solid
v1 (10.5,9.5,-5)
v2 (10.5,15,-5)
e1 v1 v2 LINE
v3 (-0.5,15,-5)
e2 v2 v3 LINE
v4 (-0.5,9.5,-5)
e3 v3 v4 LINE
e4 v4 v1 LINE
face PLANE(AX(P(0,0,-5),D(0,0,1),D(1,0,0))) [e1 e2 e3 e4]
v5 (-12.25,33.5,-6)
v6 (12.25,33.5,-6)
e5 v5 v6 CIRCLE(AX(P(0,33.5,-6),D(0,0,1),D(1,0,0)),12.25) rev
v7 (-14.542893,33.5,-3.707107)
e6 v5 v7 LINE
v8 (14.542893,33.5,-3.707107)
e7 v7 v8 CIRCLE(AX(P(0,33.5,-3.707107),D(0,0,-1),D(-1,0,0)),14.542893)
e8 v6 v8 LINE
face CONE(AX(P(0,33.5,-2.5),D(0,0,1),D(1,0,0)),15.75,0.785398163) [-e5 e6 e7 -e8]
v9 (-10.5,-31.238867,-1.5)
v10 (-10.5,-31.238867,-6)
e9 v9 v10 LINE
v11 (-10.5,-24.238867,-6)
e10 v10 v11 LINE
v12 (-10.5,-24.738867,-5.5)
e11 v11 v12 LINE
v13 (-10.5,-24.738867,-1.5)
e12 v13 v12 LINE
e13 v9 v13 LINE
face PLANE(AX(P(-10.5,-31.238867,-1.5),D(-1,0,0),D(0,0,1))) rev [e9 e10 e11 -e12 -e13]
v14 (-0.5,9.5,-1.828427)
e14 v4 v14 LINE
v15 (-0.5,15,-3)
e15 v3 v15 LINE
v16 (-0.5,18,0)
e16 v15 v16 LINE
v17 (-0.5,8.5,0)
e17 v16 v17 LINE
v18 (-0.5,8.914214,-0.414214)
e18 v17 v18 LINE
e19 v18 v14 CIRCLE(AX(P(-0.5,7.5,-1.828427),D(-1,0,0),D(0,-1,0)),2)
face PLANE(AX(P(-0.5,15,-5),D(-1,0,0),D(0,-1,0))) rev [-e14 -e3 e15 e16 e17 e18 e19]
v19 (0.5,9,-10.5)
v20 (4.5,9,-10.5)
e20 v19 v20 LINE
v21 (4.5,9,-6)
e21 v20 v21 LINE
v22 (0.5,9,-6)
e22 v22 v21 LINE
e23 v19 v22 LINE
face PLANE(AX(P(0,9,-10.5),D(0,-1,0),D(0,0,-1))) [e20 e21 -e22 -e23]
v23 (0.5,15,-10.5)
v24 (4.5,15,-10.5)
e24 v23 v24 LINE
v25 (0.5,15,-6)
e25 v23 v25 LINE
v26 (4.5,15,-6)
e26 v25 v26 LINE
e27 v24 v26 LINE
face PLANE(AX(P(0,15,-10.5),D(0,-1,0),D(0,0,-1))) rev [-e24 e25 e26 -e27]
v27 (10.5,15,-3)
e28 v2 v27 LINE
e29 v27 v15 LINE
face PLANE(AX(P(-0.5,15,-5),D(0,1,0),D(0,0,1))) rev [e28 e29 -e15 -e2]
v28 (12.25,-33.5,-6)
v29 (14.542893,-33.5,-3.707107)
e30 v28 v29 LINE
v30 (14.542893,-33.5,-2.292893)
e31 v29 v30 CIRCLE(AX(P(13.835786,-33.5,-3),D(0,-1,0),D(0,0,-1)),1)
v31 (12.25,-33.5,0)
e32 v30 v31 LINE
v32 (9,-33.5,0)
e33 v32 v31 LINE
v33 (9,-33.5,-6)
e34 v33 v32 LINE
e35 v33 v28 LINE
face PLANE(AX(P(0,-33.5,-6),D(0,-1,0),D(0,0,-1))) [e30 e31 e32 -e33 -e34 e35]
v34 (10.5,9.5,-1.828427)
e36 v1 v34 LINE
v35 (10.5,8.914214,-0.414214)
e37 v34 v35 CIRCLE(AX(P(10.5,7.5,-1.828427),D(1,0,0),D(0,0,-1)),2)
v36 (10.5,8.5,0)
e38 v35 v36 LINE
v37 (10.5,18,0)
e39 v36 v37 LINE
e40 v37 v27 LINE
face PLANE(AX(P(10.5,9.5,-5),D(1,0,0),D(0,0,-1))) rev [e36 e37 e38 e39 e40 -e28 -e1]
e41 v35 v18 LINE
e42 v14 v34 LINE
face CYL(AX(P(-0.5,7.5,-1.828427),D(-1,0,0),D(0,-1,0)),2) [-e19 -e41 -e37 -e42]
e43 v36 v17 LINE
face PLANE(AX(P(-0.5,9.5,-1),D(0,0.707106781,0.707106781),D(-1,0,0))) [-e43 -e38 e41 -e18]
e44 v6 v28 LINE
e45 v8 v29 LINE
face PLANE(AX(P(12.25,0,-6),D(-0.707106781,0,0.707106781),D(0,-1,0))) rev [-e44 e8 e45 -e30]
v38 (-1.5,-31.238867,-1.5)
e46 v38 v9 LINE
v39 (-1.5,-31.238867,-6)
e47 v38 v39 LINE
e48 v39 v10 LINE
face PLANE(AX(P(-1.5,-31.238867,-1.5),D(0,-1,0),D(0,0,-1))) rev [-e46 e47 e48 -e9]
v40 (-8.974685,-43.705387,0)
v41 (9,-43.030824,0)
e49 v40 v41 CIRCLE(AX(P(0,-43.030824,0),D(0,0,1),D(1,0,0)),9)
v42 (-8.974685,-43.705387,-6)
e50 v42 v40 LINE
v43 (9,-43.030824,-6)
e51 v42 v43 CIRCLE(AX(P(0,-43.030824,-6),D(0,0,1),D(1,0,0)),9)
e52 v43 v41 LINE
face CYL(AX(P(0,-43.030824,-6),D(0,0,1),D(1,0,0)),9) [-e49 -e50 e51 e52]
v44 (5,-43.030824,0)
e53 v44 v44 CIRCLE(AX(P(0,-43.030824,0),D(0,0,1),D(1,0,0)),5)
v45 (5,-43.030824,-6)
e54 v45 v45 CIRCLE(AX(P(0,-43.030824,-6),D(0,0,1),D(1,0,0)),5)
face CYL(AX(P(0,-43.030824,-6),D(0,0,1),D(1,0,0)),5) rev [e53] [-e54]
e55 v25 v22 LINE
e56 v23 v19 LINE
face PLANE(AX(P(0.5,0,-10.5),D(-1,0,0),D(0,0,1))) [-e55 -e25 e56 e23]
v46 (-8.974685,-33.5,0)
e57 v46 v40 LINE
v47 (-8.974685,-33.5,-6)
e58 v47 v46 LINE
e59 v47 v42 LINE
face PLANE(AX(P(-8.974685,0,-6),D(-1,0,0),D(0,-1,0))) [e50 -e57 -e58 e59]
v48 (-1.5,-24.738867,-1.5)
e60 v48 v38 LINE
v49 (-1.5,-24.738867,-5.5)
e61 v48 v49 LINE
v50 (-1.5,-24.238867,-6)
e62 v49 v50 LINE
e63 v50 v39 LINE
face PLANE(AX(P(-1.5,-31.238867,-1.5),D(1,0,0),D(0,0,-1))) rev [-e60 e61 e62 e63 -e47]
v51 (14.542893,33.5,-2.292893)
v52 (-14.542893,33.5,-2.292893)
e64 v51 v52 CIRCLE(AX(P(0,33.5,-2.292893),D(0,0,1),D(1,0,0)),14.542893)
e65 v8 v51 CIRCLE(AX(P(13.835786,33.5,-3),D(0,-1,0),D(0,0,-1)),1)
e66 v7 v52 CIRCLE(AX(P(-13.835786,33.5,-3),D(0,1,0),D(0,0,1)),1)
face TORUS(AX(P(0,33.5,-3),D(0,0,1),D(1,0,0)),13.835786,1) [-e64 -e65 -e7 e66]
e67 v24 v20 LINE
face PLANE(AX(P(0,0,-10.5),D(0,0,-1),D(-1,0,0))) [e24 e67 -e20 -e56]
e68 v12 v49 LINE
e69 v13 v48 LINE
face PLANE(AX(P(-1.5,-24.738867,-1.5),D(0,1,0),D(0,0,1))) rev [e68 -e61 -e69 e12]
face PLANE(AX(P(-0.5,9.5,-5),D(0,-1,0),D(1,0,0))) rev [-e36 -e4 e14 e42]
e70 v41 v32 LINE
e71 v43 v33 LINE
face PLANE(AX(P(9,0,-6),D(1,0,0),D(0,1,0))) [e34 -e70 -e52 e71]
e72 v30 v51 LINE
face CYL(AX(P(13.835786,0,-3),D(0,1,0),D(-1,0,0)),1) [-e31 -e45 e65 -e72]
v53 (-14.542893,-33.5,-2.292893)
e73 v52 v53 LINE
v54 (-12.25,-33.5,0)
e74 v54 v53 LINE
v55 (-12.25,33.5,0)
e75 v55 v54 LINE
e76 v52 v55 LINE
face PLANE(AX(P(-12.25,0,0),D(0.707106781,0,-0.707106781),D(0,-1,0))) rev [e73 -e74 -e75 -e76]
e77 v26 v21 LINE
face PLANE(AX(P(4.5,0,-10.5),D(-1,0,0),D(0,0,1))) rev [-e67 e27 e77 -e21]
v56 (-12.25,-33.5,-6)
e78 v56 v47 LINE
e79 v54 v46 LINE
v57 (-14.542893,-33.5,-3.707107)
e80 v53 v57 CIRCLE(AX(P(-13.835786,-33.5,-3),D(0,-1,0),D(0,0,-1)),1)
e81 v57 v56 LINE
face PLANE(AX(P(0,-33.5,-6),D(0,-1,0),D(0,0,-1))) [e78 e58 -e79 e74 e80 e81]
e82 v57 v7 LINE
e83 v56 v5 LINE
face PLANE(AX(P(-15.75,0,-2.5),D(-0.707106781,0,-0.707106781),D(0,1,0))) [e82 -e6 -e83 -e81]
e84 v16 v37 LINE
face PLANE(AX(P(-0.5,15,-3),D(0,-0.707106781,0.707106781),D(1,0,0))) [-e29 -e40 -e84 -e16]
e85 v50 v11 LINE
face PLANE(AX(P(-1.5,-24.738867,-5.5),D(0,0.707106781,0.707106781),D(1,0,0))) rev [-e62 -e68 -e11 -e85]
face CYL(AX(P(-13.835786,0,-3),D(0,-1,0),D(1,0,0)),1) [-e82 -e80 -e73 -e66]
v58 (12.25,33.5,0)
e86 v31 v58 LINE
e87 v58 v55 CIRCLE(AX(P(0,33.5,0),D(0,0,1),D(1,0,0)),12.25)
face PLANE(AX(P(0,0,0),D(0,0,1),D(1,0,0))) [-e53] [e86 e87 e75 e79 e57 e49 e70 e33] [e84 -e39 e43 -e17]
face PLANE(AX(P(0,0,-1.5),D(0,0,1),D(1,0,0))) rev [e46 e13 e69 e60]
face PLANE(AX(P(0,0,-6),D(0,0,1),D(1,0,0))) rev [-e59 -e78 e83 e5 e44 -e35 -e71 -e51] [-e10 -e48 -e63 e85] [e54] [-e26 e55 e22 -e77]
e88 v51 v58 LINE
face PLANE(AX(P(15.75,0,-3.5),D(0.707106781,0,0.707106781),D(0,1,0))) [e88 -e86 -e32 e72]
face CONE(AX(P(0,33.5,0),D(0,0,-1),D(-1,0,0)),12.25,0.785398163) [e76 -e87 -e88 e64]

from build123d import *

# Parameters (mm, degrees)
DODANIE_WYCI_GNI_CIE1_DEPTH = 6
SFAZOWANIE1_SIZE            = 3.5
ZAOKR_GLENIE1_R             = 1
SZKIC2_W                    = 11
SZKIC2_H                    = 5.5
WYTNIJ_WYCI_GNI_CIE1_DEPTH  = 5
SZKIC3_W                    = 9
SZKIC3_H                    = 6.5
WYTNIJ_WYCI_GNI_CIE2_DEPTH  = 4.5
SFAZOWANIE2_SIZE            = 0.5
SZKIC4_R                    = 5
DODANIE_WYCI_GNI_CIE2_DEPTH = 6
SZKIC5_W                    = 4
SZKIC5_H                    = 6
DODANIE_WYCI_GNI_CIE3_DEPTH = 4.5
SFAZOWANIE3_SIZE            = 3
SFAZOWANIE4_SIZE            = 1
ZAOKR_GLENIE2_R             = 2


with BuildPart() as part:
    # Szkic1 → Dodanie-wyciągnięcie1 (new body)
    with BuildSketch(Plane.XY):
        with BuildLine():
            ThreePointArc((15.75, 33.5), (0, 49.25), (-15.75, 33.5))
            Line((-15.75, 33.5), (15.75, 33.5))
        make_face()
        with BuildLine():
            Line((15.75, 33.5), (-15.75, 33.5))
            ThreePointArc((-15.75, 33.5), (0, 17.75), (15.75, 33.5))
        make_face()
        with BuildLine():
            ThreePointArc((15.75, 33.5), (0, 17.75), (-15.75, 33.5))
            Line((-15.75, 33.5), (-15.75, -33.5))
            Line((-15.75, -33.5), (15.75, -33.5))
            Line((15.75, -33.5), (15.75, 33.5))
        make_face()
    extrude(amount=-DODANIE_WYCI_GNI_CIE1_DEPTH)

    # Sfazowanie1
    # the kernel refuses this chamfer: 3.5 mm, written as the material it takes off along each edge
    with BuildSketch(Plane(origin=(15.75, -42.500890458, 0), x_dir=(-0.9996219169112968, 0, 0.02749587661058637), z_dir=(0, 1, 0)), Plane(origin=(-15.75, 33.5, 0), x_dir=(0.9996219169112968, 0, 0.02749587661058637), z_dir=(0, -1, 0)), Plane(origin=(-15.75, 33.5, -6), x_dir=(-0.02749587661058661, 0, 0.9996219169112968), z_dir=(0, -1, 0))) as sfazowanie1_piece_1:
        Polygon((SFAZOWANIE1_SIZE * 0.999621916911, -SFAZOWANIE1_SIZE * 0.0274958766106), (-SFAZOWANIE1_SIZE * 0.0274958766106, -SFAZOWANIE1_SIZE * 0.999621916911), (0, 0), align=None)
    extrude(amount=76.000890458, mode=Mode.SUBTRACT)
    with BuildSketch(Plane(origin=(15.75, -42.500890458, -6), x_dir=(-0.9996219169112968, 0, -0.027495876610586358), z_dir=(0, 1, 0))) as sfazowanie1_piece_2:
        Polygon((SFAZOWANIE1_SIZE * 0.999621916911, SFAZOWANIE1_SIZE * 0.0274958766106), (-SFAZOWANIE1_SIZE * 0.0274958766106, SFAZOWANIE1_SIZE * 0.999621916911), (0, 0), align=None)
    extrude(amount=76.000890458, mode=Mode.SUBTRACT)
    with BuildSketch(Plane(origin=(0, 33.5, 0), x_dir=(-1, 0, 0), z_dir=(0, -1, 0))) as sfazowanie1_piece_3:
        Polygon((15.75, SFAZOWANIE1_SIZE), (15.75 - SFAZOWANIE1_SIZE, 0), (15.75, 0), align=None)
    revolve(axis=Axis((0, 33.5, 0), (0, 0, -1)), revolution_arc=180, mode=Mode.SUBTRACT)
    with BuildSketch(Plane(origin=(0, 33.5, -6), x_dir=(1, 0, 0), z_dir=(0, -1, 0))) as sfazowanie1_piece_4:
        Polygon((15.75, SFAZOWANIE1_SIZE), (15.75 - SFAZOWANIE1_SIZE, 0), (15.75, 0), align=None)
    revolve(axis=Axis((0, 33.5, -6), (0, 0, 1)), revolution_arc=180, mode=Mode.SUBTRACT)

    # Zaokrąglenie1
    zaokr_glenie1_edges = [part.edges().sort_by_distance(p)[0] for p in [
        (-15.25, 0, -3),
        (0, 48.75, -3),
        (15.25, 0, -3),
    ]]
    fillet(zaokr_glenie1_edges, radius=ZAOKR_GLENIE1_R)

    # Szkic2 → Wytnij-wyciągnięcie1 (cut)
    with BuildSketch(Plane.XY):
        with Locations((5, 12.25)):
            Rectangle(SZKIC2_W, SZKIC2_H)
    extrude(amount=-WYTNIJ_WYCI_GNI_CIE1_DEPTH, mode=Mode.SUBTRACT)

    # Szkic3 → Wytnij-wyciągnięcie2 (cut)
    with BuildSketch(Plane(origin=(0, 0, -6), x_dir=(-1, 0, 0), z_dir=(0, 0, -1))):
        with Locations((6, -27.988867336)):
            Rectangle(SZKIC3_W, SZKIC3_H)
    extrude(amount=-WYTNIJ_WYCI_GNI_CIE2_DEPTH, mode=Mode.SUBTRACT)

    # Sfazowanie2
    sfazowanie2_edges = [part.edges().sort_by_distance(p)[0] for p in [
        (-6, -24.738867336, -6),
    ]]
    chamfer(sfazowanie2_edges, length=SFAZOWANIE2_SIZE)

    # Szkic4 → Dodanie-wyciągnięcie2 (add)
    with BuildSketch(Plane.XY):
        with BuildLine():
            Line((9, -33.5), (-8.974684649, -33.5))
            Line((-8.974684649, -33.5), (-8.974684649, -43.705386779))
            ThreePointArc((-8.974684649, -43.705386779), (0.337519003, -52.024492564), (9, -43.030823629))
            Line((9, -43.030823629), (9, -33.5))
        make_face()
        with Locations((0, -43.030823629)):
            Circle(SZKIC4_R, mode=Mode.SUBTRACT)
    extrude(amount=-DODANIE_WYCI_GNI_CIE2_DEPTH)

    # Szkic5 → Dodanie-wyciągnięcie3 (add)
    with BuildSketch(Plane(origin=(0, 0, -6), x_dir=(-1, 0, 0), z_dir=(0, 0, -1))):
        with Locations((-2.5, 12)):
            Rectangle(SZKIC5_W, SZKIC5_H)
    extrude(amount=DODANIE_WYCI_GNI_CIE3_DEPTH)

    # Sfazowanie3
    sfazowanie3_edges = [part.edges().sort_by_distance(p)[0] for p in [
        (5, 15, 0),
    ]]
    chamfer(sfazowanie3_edges, length=SFAZOWANIE3_SIZE)

    # Sfazowanie4
    sfazowanie4_edges = [part.edges().sort_by_distance(p)[0] for p in [
        (5, 9.5, 0),
    ]]
    chamfer(sfazowanie4_edges, length=SFAZOWANIE4_SIZE)

    # Zaokrąglenie2
    zaokr_glenie2_edges = [part.edges().sort_by_distance(p)[0] for p in [
        (5, 9.5, -1),
    ]]
    fillet(zaokr_glenie2_edges, radius=ZAOKR_GLENIE2_R)


solid = part.part
